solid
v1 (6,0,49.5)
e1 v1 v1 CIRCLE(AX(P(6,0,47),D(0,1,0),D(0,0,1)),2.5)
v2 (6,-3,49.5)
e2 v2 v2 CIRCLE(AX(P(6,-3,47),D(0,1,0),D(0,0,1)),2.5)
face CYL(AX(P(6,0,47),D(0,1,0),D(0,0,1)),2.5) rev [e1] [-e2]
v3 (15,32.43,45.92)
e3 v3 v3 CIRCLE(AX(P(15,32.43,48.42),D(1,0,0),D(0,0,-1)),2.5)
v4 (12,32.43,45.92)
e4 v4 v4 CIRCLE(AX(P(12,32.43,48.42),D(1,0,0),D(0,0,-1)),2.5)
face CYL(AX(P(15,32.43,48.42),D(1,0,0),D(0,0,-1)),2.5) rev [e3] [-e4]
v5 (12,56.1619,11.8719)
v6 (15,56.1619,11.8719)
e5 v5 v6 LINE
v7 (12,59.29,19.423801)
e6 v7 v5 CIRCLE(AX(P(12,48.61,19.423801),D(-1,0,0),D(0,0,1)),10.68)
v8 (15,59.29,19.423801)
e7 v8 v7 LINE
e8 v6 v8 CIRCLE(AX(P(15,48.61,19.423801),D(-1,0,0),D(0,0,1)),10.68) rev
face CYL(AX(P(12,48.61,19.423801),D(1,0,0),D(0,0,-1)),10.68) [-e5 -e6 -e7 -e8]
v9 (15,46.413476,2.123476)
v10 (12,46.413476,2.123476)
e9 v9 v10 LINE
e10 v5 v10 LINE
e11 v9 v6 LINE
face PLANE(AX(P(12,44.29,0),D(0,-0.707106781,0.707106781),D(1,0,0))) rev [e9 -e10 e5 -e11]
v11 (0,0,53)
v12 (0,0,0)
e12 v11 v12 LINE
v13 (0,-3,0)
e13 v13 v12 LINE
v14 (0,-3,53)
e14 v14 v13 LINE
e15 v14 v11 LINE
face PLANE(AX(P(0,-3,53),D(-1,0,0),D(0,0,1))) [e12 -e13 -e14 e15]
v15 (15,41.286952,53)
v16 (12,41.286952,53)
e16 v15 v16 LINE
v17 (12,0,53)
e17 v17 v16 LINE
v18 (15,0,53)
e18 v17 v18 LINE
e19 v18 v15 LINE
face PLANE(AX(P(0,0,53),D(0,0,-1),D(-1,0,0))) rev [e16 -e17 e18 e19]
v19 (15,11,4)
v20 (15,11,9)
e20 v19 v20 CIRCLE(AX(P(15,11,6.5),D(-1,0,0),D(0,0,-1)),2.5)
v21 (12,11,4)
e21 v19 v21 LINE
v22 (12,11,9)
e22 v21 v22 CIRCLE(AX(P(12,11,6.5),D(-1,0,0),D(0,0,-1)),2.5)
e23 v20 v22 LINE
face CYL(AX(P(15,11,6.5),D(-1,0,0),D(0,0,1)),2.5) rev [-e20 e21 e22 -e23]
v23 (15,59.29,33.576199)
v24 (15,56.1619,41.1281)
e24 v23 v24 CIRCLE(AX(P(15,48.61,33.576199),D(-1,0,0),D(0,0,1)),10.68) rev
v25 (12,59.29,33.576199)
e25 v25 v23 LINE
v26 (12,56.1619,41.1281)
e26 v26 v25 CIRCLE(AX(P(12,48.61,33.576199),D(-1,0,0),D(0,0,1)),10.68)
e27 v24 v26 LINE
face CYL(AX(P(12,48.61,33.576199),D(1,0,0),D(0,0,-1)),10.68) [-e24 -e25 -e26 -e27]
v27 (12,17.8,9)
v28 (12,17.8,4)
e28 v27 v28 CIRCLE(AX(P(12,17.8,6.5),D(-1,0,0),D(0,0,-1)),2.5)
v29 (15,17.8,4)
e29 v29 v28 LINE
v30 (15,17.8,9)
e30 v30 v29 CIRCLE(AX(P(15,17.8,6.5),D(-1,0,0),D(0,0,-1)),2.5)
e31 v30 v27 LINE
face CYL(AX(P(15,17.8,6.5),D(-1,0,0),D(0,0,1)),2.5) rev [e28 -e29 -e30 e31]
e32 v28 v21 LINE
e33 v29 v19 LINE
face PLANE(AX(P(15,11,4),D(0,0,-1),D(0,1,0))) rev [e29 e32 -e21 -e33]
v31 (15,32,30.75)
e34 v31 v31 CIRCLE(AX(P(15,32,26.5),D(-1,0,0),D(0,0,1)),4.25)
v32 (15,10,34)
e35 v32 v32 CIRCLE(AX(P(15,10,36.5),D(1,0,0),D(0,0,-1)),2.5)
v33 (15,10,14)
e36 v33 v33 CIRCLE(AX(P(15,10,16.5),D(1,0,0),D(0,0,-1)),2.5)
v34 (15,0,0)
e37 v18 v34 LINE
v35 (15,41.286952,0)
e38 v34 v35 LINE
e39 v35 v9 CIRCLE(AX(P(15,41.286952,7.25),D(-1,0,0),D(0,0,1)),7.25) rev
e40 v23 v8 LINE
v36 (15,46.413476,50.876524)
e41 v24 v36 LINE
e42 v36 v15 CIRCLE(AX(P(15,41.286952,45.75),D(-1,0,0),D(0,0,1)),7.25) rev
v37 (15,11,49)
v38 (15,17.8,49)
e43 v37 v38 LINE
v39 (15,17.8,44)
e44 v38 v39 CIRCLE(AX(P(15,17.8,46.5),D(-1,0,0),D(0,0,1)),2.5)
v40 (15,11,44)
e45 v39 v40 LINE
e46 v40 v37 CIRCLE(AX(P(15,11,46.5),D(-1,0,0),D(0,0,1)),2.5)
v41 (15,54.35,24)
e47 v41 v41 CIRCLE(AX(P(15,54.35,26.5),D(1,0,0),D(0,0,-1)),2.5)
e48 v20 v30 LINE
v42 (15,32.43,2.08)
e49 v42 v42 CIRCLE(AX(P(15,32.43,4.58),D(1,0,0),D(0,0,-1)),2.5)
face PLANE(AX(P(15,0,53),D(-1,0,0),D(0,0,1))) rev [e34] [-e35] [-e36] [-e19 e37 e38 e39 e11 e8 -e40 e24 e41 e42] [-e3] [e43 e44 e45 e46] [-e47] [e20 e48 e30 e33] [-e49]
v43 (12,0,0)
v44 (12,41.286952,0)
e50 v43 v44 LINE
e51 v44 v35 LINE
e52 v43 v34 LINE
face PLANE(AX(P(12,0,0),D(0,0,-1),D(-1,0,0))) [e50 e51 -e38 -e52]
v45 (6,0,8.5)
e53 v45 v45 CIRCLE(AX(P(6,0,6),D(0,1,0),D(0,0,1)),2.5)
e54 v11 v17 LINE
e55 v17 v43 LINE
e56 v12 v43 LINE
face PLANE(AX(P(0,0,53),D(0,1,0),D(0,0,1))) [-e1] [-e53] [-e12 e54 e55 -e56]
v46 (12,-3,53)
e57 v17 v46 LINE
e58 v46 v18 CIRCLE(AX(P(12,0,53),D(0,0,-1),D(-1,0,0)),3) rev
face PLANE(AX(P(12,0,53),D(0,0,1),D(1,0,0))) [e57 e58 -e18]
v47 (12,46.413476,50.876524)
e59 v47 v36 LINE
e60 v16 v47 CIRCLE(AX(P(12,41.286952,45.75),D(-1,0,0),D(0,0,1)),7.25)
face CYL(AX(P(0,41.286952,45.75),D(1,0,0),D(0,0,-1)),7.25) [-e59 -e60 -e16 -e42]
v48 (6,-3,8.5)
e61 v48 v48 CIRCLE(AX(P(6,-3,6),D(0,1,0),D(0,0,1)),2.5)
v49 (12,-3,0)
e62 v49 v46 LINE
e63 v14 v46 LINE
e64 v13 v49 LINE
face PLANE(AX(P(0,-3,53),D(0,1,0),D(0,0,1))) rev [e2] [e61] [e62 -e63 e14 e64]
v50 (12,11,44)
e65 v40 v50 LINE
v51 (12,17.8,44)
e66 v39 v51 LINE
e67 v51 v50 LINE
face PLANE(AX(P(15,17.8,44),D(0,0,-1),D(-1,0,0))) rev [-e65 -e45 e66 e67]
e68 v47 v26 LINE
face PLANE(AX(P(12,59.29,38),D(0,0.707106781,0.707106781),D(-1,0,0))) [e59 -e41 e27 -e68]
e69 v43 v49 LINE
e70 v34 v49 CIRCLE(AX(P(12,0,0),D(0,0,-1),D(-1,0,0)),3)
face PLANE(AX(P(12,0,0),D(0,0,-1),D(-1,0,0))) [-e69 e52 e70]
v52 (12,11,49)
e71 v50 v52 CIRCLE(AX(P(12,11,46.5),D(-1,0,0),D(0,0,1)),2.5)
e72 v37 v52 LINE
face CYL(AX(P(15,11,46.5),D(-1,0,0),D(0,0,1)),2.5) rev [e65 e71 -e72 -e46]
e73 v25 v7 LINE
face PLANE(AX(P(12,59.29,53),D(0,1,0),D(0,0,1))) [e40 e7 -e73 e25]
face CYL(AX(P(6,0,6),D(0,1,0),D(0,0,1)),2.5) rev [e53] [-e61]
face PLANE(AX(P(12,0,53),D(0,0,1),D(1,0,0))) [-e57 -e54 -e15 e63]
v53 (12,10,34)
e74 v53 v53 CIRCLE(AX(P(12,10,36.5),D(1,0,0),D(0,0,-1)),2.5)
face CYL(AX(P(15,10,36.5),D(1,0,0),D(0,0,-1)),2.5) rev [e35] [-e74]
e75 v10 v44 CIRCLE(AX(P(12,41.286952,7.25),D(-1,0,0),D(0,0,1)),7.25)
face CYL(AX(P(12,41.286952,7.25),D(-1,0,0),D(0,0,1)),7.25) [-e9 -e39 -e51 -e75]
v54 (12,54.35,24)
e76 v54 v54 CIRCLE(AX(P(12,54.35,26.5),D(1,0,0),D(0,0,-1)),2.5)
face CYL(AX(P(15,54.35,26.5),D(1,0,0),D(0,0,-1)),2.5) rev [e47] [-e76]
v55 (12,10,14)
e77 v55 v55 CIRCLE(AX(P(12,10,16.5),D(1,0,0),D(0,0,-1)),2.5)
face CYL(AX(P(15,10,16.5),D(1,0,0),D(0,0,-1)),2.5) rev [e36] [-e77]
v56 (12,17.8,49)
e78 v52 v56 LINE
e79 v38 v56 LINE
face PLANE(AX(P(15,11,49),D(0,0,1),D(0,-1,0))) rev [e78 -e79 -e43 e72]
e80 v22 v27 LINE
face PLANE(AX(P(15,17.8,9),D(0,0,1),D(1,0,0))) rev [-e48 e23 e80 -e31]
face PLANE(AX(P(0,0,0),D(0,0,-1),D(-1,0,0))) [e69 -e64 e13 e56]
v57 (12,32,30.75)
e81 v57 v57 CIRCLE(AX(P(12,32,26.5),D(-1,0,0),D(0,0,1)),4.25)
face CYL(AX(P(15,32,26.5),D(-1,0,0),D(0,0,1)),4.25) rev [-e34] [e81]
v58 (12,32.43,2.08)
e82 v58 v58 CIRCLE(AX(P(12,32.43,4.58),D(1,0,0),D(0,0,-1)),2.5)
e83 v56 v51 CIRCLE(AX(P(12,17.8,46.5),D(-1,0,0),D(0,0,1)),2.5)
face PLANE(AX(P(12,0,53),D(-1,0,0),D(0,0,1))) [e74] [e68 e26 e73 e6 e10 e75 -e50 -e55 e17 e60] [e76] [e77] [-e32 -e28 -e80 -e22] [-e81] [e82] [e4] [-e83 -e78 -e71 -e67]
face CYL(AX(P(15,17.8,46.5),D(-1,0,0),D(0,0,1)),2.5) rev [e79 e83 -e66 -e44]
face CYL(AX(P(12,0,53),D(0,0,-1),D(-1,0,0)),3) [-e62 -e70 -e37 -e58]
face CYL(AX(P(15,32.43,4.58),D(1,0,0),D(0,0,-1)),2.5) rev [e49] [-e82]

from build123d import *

# Parameters (mm, degrees)
SM_BASE_FLANGE_1_DEPTH = 53
HOLE_WIZARD_M6_1_D     = 5
HOLE_WIZARD_M6_1_DEPTH = 3
HOLE_WIZARD_M6_1_TIP   = 1.502151548
HOLE_WIZARD_M6_2_D     = 5
HOLE_WIZARD_M6_2_DEPTH = 17
HOLE_WIZARD_M6_2_TIP   = 1.502151548
SKETCH_16_R            = 4.25
CUT_EXTRUDE_1_DEPTH    = 3
CHAMFER_1_SIZE         = 15
FILLET_1_R             = 10.68
FILLET_2_R             = 7.25


# Read off the part's stored shape, not the designer's step: 基体-法兰1
with BuildPart() as part:
    # 基体-法兰1 outline → 基体-法兰1 (new body)
    with BuildSketch(Plane.XY):
        with BuildLine():
            Line((15, 0), (15, 59.29))
            Line((15, 59.29), (12, 59.29))
            Line((12, 59.29), (12, 0))
            Line((12, 0), (0, 0))
            Line((0, 0), (0, -3))
            Line((0, -3), (12, -3))
            ThreePointArc((12, -3), (14.121320344, -2.121320344), (15, 0))
        make_face()
    extrude(amount=SM_BASE_FLANGE_1_DEPTH)

    # M6 螺纹孔1
    with Locations(Plane(origin=(15, 0, 0), x_dir=(0, 0, -1), z_dir=(1, 0, 0))):
        with Locations((-26.5, 54.35), (-48.42, 32.43), (-4.58, 32.43), (-36.5, 10), (-16.5, 10)):
            Hole(HOLE_WIZARD_M6_1_D / 2, depth=HOLE_WIZARD_M6_1_DEPTH)
            with Locations((0, 0, -(HOLE_WIZARD_M6_1_DEPTH + HOLE_WIZARD_M6_1_TIP / 2))):  # 118° drill point
                Cone(0, HOLE_WIZARD_M6_1_D / 2, HOLE_WIZARD_M6_1_TIP, mode=Mode.SUBTRACT)

    # M6 螺纹孔2
    with Locations(Plane(origin=(0, 0, 0), x_dir=(1, 0, 0), z_dir=(0, 1, 0))):
        with Locations((6, -6), (6, -47)):
            Hole(HOLE_WIZARD_M6_2_D / 2, depth=HOLE_WIZARD_M6_2_DEPTH)
            with Locations((0, 0, -(HOLE_WIZARD_M6_2_DEPTH + HOLE_WIZARD_M6_2_TIP / 2))):  # 118° drill point
                Cone(0, HOLE_WIZARD_M6_2_D / 2, HOLE_WIZARD_M6_2_TIP, mode=Mode.SUBTRACT)

    # 草图16 → 切除-拉伸1 (cut)
    with BuildSketch(Plane.ZY.offset(-12)):
        with Locations((26.5, 32)):
            Circle(SKETCH_16_R)
        with BuildLine():
            Line((44, 17.8), (44, 11))
            ThreePointArc((44, 11), (46.5, 8.5), (49, 11))
            Line((49, 11), (49, 17.8))
            ThreePointArc((49, 17.8), (46.5, 20.3), (44, 17.8))
        make_face()
        with BuildLine():
            Line((9, 17.8), (9, 11))
            ThreePointArc((9, 11), (6.5, 8.5), (4, 11))
            Line((4, 11), (4, 17.8))
            ThreePointArc((4, 17.8), (6.5, 20.3), (9, 17.8))
        make_face()
    extrude(amount=-CUT_EXTRUDE_1_DEPTH, mode=Mode.SUBTRACT)

    # 倒角1
    chamfer_1_edges = [part.edges().sort_by_distance(p)[0] for p in [
        (13.5, 59.29, 0),
        (13.5, 59.29, 53),
    ]]
    chamfer(chamfer_1_edges, length=CHAMFER_1_SIZE)

    # 圆角1
    fillet_1_edges = [part.edges().sort_by_distance(p)[0] for p in [
        (13.5, 59.29, 15),
        (13.5, 59.29, 38),
    ]]
    fillet(fillet_1_edges, radius=FILLET_1_R)

    # 圆角2
    fillet_2_edges = [part.edges().sort_by_distance(p)[0] for p in [
        (13.5, 44.29, 53),
        (13.5, 44.29, 0),
    ]]
    fillet(fillet_2_edges, radius=FILLET_2_R)


solid = part.part
